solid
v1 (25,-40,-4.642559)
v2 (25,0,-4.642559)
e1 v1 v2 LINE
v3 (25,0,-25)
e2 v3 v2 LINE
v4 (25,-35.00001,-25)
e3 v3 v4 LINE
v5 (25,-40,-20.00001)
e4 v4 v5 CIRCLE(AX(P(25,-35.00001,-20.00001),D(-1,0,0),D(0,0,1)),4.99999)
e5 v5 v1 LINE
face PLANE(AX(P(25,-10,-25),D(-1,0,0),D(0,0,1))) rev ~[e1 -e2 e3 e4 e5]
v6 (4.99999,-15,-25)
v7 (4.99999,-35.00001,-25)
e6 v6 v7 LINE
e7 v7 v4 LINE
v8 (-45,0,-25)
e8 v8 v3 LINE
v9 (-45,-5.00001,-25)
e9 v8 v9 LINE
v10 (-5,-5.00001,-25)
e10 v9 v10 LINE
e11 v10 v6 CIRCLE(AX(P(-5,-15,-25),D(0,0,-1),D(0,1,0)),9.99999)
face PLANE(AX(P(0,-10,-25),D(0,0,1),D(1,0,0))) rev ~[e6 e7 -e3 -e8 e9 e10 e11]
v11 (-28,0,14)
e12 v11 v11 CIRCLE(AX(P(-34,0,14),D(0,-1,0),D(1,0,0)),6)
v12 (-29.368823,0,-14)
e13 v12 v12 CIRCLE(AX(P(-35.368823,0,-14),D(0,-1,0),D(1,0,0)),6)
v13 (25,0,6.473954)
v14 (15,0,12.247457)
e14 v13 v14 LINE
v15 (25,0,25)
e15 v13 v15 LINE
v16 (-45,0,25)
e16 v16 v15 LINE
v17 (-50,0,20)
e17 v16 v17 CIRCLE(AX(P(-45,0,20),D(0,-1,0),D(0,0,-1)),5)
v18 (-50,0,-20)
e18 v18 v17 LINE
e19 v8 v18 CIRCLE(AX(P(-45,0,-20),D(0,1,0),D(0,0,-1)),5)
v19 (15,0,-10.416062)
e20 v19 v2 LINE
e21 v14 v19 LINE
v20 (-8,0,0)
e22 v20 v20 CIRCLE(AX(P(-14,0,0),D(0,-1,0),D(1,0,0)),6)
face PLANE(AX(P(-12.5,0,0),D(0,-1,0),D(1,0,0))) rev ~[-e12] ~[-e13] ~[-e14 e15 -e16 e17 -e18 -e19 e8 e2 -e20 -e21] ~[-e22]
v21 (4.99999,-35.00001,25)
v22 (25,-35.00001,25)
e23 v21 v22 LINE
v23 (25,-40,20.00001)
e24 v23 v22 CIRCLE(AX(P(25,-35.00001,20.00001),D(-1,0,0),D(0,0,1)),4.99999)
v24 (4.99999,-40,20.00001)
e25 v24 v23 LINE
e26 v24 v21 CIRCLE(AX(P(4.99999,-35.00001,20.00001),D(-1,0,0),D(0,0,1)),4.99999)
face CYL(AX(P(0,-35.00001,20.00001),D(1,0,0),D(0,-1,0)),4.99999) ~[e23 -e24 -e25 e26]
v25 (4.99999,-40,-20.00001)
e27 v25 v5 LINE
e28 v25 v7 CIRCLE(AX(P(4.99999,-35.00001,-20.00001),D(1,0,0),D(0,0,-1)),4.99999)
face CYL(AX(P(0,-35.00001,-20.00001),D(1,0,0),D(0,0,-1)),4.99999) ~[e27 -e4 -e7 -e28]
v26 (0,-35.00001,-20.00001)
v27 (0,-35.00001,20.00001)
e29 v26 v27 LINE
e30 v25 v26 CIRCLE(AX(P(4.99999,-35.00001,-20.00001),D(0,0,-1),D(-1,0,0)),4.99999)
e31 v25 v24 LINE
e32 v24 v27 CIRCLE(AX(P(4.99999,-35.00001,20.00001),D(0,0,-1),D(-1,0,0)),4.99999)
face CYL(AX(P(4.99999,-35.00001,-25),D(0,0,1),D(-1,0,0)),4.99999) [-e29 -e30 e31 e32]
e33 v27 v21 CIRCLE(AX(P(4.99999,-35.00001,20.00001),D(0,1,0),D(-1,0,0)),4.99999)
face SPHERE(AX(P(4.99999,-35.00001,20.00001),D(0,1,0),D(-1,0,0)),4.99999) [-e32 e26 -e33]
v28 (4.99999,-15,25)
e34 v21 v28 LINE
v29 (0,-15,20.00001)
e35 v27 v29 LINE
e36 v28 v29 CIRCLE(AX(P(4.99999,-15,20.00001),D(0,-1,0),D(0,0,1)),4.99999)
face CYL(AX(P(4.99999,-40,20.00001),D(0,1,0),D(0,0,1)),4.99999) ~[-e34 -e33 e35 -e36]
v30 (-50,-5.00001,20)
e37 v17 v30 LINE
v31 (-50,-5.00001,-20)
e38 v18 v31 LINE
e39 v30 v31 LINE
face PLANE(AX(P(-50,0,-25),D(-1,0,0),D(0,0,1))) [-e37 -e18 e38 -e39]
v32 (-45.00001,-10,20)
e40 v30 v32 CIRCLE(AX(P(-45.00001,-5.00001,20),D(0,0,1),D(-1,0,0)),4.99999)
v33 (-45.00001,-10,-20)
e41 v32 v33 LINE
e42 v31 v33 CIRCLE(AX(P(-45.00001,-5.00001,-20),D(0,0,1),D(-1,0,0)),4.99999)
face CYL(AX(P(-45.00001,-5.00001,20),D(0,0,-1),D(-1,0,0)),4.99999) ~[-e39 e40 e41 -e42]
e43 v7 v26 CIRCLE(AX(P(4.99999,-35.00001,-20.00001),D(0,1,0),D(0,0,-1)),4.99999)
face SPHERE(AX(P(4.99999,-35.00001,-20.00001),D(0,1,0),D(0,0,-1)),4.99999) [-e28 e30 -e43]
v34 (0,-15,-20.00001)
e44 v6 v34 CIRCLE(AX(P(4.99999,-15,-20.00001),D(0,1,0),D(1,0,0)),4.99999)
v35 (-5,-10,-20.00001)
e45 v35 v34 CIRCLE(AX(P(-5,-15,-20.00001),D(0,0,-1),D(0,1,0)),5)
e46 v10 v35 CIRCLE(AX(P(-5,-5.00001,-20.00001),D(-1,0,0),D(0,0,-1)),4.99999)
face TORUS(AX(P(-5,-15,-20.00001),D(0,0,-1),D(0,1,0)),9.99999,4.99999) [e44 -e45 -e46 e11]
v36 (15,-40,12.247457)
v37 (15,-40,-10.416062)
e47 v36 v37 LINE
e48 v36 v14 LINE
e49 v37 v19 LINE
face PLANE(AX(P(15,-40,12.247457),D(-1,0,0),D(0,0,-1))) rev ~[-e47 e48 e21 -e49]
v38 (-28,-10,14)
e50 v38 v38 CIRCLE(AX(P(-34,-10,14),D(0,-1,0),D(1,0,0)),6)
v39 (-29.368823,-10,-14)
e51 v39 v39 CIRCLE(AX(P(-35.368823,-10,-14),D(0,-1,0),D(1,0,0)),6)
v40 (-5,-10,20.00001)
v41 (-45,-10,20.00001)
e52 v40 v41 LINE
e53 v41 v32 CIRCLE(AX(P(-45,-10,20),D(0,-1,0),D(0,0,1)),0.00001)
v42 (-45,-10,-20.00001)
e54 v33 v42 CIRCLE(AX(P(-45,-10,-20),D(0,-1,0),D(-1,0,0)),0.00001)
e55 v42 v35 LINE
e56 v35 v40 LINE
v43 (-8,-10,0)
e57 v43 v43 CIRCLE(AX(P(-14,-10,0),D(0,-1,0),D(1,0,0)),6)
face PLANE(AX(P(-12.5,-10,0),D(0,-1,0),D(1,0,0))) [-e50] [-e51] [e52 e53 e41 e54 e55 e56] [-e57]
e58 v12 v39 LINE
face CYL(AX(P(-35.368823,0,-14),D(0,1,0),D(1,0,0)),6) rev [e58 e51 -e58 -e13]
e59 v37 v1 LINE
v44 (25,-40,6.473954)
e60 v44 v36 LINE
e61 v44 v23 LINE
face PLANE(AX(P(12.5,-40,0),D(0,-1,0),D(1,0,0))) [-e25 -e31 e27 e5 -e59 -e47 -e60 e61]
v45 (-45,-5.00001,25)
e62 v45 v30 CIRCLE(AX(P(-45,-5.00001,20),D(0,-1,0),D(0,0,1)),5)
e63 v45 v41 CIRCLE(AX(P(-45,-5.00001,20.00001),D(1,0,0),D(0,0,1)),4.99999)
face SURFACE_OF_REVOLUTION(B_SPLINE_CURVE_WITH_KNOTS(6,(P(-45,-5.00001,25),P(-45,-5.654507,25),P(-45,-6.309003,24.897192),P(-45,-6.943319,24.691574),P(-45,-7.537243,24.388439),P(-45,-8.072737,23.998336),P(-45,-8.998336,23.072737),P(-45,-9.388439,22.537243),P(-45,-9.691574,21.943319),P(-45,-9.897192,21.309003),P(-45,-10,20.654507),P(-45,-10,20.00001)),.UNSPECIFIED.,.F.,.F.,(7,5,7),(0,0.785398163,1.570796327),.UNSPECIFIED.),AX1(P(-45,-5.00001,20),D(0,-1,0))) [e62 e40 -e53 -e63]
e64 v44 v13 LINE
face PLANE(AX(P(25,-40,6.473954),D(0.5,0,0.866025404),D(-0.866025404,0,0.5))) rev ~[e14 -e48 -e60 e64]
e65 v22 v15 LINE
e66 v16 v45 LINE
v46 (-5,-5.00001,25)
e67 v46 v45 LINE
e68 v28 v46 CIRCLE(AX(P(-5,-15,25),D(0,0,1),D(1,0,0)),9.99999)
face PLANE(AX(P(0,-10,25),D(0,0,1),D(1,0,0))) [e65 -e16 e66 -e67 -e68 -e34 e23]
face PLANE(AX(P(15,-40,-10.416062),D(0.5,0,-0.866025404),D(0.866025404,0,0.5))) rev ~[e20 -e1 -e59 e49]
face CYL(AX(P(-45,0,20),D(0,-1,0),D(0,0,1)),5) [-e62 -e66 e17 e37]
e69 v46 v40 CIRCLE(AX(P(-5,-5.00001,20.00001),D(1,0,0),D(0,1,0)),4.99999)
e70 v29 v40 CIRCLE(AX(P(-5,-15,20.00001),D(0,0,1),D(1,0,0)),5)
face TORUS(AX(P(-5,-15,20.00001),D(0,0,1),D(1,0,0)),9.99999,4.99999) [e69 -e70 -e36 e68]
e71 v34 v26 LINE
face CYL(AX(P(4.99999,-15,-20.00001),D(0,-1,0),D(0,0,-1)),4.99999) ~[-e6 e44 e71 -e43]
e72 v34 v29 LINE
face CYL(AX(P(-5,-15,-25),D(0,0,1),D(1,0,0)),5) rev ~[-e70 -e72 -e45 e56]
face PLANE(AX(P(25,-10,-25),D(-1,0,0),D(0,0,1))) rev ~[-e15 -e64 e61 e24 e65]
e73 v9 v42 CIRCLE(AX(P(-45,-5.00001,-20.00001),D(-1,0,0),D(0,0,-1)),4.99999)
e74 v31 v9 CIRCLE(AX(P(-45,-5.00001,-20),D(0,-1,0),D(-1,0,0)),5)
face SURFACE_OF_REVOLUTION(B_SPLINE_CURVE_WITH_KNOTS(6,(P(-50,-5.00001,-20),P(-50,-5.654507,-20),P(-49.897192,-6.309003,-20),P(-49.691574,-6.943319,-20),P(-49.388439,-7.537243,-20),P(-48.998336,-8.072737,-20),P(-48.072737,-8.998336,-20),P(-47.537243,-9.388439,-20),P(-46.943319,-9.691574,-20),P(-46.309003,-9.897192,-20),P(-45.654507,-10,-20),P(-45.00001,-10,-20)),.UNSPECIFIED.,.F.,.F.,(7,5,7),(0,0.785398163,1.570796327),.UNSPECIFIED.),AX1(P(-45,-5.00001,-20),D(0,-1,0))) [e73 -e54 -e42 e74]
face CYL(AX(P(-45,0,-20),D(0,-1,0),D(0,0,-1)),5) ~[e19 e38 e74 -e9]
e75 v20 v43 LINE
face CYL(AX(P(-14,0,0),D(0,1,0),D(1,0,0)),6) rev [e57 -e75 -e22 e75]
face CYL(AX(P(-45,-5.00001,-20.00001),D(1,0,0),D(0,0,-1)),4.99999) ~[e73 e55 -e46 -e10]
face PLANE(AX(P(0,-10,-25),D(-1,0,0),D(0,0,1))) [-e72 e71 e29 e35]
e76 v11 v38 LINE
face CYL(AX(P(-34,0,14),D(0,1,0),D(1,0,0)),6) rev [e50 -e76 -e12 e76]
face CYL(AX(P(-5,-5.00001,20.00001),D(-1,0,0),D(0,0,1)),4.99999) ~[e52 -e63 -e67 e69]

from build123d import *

# Parameters (mm, degrees)
F0_W     = 75
F0_H     = 50
F0_R     = 6
F1_DEPTH = 10
F2_W     = 25
F2_H     = 50
F3_DEPTH = 30
F5_DEPTH = 40.001
F6_R     = 5
F7_R     = 4.99999


# Not quite as in the source:
# - a fillet or chamfer is up to 0.001 mm smaller than in the source, because OpenCascade refuses the exact size


with BuildPart() as f1:
    # F0 (on Front) → F1 (new body)
    with BuildSketch(Plane.XZ):
        with Locations((-12.5, 0)):
            Rectangle(F0_W, F0_H)
        with Locations((-35.368822515, -14)):
            Circle(F0_R, mode=Mode.SUBTRACT)
        with Locations((-14, 0)):
            Circle(F0_R, mode=Mode.SUBTRACT)
        with Locations((-34, 14)):
            Circle(F0_R, mode=Mode.SUBTRACT)
    extrude(amount=F1_DEPTH)

    # F2 (on face) → F3 (join)
    with BuildSketch(Plane.XZ.offset(10)):
        with Locations((12.5, 0)):
            Rectangle(F2_W, F2_H)
    extrude(amount=F3_DEPTH)

    # F4 (on face) → F5 (cut, through all)
    with BuildSketch(Plane.XZ.offset(40)):
        Polygon((25, -4.6425589255), (25, 6.4739544771), (15, 12.247457169), (15, -10.4160616174), align=None)
    extrude(amount=-F5_DEPTH, mode=Mode.SUBTRACT)

    # F6
    f6_edges = [f1.edges().sort_by_distance(p)[0] for p in [
        (-50, -5, -25),
        (-50, -5, 25),
        (0, -10, 0),
    ]]
    fillet(f6_edges, radius=F6_R)

    # F7 (radius 5 in the source; OpenCascade refuses exactly that, so slightly less here)
    f7_edges = [f1.edges().sort_by_distance(p)[0] for p in [
        (-25, -10, -25),
        (12.5, -40, -25),
        (0, -40, 0),
        (12.5, -40, 25),
    ]]
    fillet(f7_edges, radius=F7_R)


solid = f1.part
